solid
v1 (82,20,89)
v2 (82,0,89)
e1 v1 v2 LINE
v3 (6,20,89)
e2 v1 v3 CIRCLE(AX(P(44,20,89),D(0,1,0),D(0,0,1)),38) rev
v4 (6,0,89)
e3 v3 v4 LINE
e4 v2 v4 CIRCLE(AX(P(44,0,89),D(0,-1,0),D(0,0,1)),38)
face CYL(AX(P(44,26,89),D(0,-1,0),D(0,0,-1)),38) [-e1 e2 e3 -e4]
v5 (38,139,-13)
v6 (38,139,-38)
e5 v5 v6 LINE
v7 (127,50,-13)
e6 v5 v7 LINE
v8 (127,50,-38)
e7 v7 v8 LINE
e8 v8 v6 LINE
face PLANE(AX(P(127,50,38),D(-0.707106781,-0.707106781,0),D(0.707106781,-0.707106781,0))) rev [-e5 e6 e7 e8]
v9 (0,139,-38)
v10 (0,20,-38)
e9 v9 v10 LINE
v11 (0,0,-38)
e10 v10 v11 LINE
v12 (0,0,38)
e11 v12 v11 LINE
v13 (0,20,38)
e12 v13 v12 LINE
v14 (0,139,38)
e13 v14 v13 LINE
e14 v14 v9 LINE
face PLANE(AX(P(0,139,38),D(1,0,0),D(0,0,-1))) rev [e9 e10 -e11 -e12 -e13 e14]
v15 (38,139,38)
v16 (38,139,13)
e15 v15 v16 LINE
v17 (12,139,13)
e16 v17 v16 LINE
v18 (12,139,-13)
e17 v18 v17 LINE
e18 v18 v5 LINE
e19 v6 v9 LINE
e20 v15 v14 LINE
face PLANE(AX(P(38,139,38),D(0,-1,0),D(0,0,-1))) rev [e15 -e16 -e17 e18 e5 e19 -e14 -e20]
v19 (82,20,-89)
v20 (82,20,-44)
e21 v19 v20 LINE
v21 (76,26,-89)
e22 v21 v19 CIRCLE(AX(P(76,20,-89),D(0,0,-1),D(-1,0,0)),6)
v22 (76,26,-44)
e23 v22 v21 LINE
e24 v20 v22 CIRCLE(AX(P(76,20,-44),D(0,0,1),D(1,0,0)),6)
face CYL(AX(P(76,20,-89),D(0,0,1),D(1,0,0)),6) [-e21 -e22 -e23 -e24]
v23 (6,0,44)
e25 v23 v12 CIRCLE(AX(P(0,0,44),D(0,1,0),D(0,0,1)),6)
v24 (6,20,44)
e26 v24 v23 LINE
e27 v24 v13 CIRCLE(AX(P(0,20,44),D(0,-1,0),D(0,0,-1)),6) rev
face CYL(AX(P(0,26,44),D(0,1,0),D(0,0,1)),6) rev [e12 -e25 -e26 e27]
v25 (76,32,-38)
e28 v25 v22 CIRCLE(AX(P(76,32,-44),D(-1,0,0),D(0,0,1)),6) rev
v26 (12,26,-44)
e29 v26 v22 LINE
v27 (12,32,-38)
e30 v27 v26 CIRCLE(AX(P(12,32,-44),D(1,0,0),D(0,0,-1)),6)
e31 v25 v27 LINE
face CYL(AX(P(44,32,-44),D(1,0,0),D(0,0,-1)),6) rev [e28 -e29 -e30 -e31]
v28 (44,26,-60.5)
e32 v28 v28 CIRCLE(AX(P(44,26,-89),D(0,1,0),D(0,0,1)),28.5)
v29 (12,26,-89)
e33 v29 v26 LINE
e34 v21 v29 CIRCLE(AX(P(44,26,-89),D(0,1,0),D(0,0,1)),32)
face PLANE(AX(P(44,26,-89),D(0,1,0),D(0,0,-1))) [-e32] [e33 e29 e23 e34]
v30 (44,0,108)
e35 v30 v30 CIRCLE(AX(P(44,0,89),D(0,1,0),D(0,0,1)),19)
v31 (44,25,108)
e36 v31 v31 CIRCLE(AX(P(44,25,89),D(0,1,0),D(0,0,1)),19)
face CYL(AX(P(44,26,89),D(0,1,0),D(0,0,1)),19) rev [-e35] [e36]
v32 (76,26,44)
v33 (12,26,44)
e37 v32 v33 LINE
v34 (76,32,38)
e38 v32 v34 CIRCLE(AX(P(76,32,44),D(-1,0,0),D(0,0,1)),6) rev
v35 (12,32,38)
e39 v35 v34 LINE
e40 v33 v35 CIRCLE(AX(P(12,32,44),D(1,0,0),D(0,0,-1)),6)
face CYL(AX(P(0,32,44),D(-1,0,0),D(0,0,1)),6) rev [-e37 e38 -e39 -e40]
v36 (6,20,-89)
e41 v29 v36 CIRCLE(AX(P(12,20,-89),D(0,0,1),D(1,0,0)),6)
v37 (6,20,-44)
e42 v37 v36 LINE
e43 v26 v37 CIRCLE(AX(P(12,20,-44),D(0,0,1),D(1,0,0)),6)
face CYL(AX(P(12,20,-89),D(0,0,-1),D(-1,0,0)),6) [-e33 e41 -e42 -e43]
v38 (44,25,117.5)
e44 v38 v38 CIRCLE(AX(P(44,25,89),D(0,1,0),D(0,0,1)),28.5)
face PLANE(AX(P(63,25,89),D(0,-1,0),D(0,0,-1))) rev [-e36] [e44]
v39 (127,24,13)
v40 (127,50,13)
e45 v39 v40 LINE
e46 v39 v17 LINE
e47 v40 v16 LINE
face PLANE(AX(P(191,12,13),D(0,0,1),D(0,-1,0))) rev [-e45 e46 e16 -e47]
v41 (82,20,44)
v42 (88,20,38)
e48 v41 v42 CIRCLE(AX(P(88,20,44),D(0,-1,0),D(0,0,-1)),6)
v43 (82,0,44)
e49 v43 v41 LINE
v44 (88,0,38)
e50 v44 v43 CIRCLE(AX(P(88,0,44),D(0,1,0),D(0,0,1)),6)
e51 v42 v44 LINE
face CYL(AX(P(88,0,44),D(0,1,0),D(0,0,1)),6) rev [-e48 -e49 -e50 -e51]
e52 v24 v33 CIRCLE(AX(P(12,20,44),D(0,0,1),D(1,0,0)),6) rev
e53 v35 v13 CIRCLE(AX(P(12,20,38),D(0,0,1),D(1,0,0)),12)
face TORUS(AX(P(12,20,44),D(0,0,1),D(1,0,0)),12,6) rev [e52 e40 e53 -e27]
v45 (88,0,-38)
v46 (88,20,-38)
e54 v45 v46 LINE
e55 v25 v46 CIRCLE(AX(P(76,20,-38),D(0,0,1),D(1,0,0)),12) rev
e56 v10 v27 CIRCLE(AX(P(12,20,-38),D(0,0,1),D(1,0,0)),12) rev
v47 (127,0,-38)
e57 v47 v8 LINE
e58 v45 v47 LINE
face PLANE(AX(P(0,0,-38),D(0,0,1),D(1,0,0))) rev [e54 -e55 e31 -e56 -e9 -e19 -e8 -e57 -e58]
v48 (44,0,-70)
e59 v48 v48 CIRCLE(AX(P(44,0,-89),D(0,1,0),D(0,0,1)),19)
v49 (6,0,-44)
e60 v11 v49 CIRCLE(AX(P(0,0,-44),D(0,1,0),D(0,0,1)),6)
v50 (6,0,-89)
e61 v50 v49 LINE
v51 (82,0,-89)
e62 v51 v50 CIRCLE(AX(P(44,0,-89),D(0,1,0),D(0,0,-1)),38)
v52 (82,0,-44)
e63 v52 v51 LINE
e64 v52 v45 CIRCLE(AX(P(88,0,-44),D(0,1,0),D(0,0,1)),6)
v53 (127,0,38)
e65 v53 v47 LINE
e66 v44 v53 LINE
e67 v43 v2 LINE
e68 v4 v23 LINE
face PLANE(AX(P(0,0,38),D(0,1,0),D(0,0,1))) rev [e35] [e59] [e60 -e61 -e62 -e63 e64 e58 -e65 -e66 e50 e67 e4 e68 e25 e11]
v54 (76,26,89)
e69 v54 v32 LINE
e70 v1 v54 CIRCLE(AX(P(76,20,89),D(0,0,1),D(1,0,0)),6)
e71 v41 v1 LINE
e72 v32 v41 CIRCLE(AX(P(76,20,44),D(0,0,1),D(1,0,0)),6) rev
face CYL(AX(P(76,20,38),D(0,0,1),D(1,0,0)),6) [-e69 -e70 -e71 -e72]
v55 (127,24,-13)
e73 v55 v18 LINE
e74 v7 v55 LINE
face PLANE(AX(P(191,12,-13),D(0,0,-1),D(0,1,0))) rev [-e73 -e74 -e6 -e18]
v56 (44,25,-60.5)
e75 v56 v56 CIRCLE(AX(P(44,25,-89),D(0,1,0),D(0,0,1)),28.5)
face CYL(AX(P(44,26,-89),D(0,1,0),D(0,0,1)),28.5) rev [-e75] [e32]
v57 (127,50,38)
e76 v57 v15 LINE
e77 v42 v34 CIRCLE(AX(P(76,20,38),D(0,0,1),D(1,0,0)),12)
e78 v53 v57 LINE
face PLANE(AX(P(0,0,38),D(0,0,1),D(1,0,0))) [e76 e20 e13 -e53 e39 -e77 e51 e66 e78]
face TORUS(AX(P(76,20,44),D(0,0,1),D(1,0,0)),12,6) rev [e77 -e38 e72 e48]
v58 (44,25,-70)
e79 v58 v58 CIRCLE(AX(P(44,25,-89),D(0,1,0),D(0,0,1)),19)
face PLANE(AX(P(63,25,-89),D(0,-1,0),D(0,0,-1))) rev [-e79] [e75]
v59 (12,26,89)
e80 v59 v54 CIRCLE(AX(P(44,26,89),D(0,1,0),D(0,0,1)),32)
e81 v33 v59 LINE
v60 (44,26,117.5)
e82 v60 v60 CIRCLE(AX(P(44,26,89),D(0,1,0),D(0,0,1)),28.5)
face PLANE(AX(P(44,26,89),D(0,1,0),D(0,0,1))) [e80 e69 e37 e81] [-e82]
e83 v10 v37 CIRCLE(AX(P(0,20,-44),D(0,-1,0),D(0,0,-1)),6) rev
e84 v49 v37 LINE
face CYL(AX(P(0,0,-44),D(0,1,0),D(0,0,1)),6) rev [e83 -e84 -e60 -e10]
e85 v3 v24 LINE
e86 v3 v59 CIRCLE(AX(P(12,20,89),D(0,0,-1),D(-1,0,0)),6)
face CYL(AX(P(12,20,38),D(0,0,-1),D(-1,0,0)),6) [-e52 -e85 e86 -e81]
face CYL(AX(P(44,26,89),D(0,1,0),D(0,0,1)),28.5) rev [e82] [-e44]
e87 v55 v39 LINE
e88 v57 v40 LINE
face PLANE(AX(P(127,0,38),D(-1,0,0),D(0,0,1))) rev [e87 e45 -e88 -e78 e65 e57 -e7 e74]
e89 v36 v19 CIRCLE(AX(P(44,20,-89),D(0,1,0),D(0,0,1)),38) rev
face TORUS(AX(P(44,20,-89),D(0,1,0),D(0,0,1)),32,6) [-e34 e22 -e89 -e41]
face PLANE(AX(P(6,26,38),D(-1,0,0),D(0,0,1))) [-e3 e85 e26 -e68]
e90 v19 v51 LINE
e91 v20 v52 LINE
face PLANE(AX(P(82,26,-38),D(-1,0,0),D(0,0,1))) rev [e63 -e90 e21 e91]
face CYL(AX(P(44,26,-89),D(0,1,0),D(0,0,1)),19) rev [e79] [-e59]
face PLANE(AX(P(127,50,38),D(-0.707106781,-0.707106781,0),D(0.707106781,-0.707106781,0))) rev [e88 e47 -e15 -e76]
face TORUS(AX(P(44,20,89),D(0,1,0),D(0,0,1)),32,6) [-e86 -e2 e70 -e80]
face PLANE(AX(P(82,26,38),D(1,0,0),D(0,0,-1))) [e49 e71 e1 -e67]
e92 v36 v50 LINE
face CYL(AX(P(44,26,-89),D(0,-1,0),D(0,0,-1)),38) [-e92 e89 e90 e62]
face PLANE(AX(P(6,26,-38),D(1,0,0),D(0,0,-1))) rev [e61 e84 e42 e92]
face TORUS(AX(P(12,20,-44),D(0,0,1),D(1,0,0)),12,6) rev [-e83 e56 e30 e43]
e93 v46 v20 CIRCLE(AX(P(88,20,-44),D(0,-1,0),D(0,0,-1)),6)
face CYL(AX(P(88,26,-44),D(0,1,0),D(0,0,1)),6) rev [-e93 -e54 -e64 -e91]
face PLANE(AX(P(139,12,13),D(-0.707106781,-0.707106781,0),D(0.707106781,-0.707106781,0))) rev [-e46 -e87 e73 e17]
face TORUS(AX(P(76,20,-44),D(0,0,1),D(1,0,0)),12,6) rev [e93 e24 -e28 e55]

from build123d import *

# Parameters (mm, degrees)
EXTRUDE_1_DEPTH               = 38
SKETCH_2_W                    = 52
SKETCH_2_H                    = 26
CUT_EXTRUDE_1_DEPTH           = 273.053680503
EXTRUDE_2_DEPTH               = 26
HOLE_WIZARD_M36_1_D           = 38
HOLE_WIZARD_M36_1_CBORE_D     = 57
HOLE_WIZARD_M36_1_CBORE_DEPTH = 1
FILLET_2_R                    = 6


with BuildPart() as part:
    # 스케치1 → 보스-돌출1 (new, symmetric)
    with BuildSketch(Plane.XY):
        Polygon((0, 0), (127, 0), (127, 50), (38, 139), (0, 139), align=None)
    extrude(amount=EXTRUDE_1_DEPTH, both=True)

    # 스케치2 → 컷-돌출1 (cut, through all, along a direction that is not the sketch's normal)
    with BuildSketch(Plane(origin=(0, 139, 0), x_dir=(1, 0, 0), z_dir=(0, 1, 0))):
        with Locations((38, 0)):
            Rectangle(SKETCH_2_W, SKETCH_2_H)
    extrude(amount=-CUT_EXTRUDE_1_DEPTH, dir=(-0.7071067811865512, 0.7071067811865438, 0), mode=Mode.SUBTRACT)

    # 스케치3 → 보스-돌출2 (add)
    with BuildSketch(Plane.XZ):
        with BuildLine():
            Line((6, 38), (82, 38))
            Line((82, 38), (82, 89))
            ThreePointArc((82, 89), (44, 127), (6, 89))
            Line((6, 89), (6, 38))
        make_face()
    extrude_2 = extrude(amount=-EXTRUDE_2_DEPTH)

    # M36 소켓 머리 캡 나사용 카운터보어1 (through all)
    with Locations(Plane(origin=(0, 26, 0), x_dir=(1, 0, 0), z_dir=(0, 1, 0))):
        with Locations((44, -89)):
            hole_wizard_m36_1 = CounterBoreHole(HOLE_WIZARD_M36_1_D / 2, HOLE_WIZARD_M36_1_CBORE_D / 2, HOLE_WIZARD_M36_1_CBORE_DEPTH)

    # 대칭 복사1: 보스-돌출2, M36 소켓 머리 캡 나사용 카운터보어1 across plane
    add(extrude_2.mirror(Plane.XY))
    add(hole_wizard_m36_1.mirror(Plane.XY), mode=Mode.SUBTRACT)

    # 필렛2
    fillet_2_edges = [part.edges().sort_by_distance(p)[0] for p in [
        (6, 26, 63.5),
        (6, 13, 38),
        (44, 26, 127),
        (82, 26, 63.5),
        (44, 26, 38),
        (82, 13, 38),
        (6, 13, -38),
        (82, 13, -38),
        (6, 26, -63.5),
        (44, 26, -38),
        (82, 26, -63.5),
        (44, 26, -127),
    ]]
    fillet(fillet_2_edges, radius=FILLET_2_R - 0.0001)  # a hair under: the kernel refuses the full size


solid = part.part
